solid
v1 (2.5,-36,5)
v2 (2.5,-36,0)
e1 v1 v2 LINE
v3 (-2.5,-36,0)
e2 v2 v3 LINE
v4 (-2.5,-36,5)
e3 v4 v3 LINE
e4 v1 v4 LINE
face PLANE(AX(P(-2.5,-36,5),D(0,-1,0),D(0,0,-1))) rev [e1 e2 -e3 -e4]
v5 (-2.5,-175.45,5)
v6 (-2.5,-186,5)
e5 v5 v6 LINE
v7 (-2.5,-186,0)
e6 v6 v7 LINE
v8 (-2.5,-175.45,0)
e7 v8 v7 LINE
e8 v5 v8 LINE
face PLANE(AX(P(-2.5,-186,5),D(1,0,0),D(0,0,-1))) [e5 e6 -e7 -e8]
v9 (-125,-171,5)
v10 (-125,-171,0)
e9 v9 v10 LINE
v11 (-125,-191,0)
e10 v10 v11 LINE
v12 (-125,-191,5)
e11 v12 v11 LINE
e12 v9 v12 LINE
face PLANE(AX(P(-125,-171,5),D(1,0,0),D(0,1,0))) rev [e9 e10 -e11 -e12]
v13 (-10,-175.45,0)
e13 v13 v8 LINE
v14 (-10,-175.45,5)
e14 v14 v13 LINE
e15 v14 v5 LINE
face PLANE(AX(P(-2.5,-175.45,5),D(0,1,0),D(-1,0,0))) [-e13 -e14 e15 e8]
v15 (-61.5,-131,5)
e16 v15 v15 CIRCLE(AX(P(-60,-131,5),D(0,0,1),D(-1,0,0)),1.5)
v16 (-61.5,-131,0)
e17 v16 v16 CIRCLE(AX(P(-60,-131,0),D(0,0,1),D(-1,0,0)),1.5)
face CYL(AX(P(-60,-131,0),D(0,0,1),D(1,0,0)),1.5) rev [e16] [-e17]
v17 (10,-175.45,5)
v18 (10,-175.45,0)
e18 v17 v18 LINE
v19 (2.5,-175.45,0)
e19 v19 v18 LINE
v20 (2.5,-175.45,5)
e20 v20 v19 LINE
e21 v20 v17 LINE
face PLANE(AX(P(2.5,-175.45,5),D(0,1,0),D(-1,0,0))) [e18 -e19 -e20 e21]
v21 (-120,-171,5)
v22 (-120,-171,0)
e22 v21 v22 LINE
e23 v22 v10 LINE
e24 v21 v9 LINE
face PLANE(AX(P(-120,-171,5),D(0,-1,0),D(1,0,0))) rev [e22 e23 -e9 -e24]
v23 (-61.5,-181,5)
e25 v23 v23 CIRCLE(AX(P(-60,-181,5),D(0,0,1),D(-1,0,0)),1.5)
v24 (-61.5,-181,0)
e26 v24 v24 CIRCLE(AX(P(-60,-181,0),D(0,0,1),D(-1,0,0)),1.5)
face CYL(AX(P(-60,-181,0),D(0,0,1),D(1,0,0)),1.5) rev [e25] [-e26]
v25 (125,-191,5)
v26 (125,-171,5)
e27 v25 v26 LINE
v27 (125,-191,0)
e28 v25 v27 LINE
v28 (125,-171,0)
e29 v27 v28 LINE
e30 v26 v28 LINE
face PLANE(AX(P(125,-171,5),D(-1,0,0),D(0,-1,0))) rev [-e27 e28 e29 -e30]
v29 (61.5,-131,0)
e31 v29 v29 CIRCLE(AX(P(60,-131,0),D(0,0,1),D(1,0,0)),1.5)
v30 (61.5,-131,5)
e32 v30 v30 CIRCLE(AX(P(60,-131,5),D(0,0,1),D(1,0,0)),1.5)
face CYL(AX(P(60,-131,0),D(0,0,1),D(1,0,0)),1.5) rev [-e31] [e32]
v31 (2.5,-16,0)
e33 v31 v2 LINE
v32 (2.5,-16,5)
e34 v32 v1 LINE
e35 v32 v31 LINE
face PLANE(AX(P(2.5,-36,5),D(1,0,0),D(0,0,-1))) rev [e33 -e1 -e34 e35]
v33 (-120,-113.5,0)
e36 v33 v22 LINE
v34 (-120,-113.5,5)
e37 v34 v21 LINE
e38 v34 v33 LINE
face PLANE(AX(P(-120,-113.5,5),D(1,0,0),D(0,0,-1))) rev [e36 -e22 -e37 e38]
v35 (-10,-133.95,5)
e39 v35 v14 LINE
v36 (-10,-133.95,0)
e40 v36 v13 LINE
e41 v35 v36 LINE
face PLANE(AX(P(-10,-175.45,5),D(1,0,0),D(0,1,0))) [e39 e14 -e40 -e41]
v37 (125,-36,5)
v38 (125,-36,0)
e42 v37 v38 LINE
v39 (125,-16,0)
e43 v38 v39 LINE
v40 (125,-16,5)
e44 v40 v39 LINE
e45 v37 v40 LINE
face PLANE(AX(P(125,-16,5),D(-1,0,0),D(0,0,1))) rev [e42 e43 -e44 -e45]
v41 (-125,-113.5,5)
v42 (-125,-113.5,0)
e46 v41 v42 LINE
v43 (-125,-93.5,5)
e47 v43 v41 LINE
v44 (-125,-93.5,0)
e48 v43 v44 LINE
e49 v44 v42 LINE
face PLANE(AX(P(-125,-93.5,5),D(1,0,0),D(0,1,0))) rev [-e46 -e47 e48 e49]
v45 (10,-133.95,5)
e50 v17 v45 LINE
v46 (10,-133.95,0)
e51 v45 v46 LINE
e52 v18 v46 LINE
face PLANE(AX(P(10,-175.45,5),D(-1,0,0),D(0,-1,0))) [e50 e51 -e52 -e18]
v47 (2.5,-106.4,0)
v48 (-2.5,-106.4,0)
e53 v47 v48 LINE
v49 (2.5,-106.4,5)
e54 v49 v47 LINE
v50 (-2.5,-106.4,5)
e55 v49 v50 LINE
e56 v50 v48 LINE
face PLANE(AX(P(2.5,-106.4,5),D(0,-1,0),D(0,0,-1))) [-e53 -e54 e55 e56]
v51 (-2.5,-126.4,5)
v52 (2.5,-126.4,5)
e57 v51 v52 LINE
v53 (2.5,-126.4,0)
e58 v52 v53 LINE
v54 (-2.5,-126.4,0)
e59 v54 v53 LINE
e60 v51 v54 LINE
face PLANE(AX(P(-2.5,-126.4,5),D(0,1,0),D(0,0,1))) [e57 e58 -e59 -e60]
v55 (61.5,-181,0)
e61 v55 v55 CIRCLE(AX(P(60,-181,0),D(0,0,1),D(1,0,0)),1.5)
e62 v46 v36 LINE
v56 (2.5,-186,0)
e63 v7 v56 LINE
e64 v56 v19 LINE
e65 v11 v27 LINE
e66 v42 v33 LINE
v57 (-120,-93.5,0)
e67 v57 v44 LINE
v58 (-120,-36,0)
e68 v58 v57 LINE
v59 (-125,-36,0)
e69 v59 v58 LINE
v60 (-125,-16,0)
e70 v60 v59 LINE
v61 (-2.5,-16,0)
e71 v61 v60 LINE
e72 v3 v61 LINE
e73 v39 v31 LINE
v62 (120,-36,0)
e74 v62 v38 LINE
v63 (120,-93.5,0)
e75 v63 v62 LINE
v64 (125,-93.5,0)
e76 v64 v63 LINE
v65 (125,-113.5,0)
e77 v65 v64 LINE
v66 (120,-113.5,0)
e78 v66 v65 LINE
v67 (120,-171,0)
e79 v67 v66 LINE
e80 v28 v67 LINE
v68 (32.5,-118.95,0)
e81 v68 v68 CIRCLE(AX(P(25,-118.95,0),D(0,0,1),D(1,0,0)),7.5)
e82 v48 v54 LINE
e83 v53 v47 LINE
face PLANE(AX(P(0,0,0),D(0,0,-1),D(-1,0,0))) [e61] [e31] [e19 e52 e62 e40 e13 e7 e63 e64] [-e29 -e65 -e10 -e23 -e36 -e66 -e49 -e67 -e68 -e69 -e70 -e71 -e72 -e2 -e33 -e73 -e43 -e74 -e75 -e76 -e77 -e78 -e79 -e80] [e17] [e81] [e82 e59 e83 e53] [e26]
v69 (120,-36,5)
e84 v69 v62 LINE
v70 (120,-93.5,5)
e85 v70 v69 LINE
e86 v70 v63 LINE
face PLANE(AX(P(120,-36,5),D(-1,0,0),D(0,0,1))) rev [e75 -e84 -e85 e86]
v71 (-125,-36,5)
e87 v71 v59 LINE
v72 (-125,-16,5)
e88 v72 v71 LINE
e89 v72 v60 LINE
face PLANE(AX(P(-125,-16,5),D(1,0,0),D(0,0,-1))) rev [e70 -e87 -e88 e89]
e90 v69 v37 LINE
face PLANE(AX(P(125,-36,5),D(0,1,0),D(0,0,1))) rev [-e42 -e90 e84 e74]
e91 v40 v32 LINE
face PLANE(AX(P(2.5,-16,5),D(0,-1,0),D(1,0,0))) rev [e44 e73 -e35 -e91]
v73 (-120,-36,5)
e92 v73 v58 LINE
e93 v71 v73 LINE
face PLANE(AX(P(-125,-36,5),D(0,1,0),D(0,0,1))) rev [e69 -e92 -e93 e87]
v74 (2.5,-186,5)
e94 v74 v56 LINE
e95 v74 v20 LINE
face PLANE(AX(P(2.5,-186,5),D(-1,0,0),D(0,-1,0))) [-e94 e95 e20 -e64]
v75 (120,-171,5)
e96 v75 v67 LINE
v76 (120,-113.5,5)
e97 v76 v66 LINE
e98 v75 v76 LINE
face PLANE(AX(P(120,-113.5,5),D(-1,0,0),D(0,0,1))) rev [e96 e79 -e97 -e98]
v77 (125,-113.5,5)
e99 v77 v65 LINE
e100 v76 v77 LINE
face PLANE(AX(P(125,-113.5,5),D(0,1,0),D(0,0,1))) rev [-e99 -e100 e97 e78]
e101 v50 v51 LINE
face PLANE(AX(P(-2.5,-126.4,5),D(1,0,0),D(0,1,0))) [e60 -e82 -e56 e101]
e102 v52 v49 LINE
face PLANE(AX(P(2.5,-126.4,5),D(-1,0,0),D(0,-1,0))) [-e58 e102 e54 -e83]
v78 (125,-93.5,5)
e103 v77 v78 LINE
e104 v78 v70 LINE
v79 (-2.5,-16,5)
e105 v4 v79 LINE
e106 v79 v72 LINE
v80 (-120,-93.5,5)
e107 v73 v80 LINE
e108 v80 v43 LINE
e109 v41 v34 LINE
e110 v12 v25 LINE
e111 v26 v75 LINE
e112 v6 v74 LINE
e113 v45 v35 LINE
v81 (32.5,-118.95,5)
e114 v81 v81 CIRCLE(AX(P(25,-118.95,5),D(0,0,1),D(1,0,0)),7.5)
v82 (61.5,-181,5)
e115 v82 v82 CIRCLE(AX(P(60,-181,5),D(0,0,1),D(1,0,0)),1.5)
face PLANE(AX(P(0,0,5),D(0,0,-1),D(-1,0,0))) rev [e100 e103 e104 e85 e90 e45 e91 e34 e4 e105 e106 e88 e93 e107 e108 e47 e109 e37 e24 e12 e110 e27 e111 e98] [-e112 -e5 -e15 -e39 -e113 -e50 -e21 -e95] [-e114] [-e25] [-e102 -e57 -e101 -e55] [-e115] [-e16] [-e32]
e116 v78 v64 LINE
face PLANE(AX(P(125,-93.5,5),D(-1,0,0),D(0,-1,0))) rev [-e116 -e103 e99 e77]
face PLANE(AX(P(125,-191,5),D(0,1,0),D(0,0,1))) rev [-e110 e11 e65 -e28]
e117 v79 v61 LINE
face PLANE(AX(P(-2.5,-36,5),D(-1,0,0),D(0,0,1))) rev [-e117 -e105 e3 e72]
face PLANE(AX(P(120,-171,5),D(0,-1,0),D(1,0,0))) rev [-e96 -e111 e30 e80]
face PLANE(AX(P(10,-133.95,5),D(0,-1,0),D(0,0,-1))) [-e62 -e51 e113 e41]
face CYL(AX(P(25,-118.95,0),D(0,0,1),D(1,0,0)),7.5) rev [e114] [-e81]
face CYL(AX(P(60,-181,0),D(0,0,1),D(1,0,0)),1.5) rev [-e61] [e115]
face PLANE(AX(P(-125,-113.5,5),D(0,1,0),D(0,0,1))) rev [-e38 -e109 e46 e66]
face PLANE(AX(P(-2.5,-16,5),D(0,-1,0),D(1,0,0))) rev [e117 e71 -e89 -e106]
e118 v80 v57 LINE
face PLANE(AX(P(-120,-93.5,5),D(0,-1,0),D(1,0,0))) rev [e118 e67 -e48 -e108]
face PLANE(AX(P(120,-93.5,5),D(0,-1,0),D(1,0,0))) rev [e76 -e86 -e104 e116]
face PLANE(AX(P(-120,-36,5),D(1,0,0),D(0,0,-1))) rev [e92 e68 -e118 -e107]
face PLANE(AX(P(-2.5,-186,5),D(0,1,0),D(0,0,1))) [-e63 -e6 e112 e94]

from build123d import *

# Parameters (mm, degrees)
BOSS_EXTRU_1_OUTLINE_W  = 5
BOSS_EXTRU_1_OUTLINE_H  = 20
BOSS_EXTRU_1_DEPTH      = 5
ESQUISSE2_R             = 1.5
ENL_V_MAT_EXTRU_1_DEPTH = 229.322140845
ESQUISSE3_R             = 7.5
ENL_V_MAT_EXTRU_2_DEPTH = 229.322140845


# Read off the part's stored shape, not the designer's step: Boss.-Extru.1
with BuildPart() as part:
    # Boss.-Extru.1 outline → Boss.-Extru.1 (new body)
    with BuildSketch(Plane.XY):
        Polygon((125, -16), (2.5, -16), (2.5, -36), (-2.5, -36), (-2.5, -16), (-125, -16), (-125, -36), (-120, -36), (-120, -93.5), (-125, -93.5), (-125, -113.5), (-120, -113.5), (-120, -171), (-125, -171), (-125, -191), (125, -191), (125, -171), (120, -171), (120, -113.5), (125, -113.5), (125, -93.5), (120, -93.5), (120, -36), (125, -36), align=None)
        Polygon((10, -133.95), (10, -175.45), (2.5, -175.45), (2.5, -186), (-2.5, -186), (-2.5, -175.45), (-10, -175.45), (-10, -133.95), align=None, mode=Mode.SUBTRACT)
        with Locations((0, -116.4)):
            Rectangle(BOSS_EXTRU_1_OUTLINE_W, BOSS_EXTRU_1_OUTLINE_H, mode=Mode.SUBTRACT)
    extrude(amount=BOSS_EXTRU_1_DEPTH)

    # Esquisse2 → Enlèv. mat.-Extru.1 (cut, through all)
    with BuildSketch(Plane.XY.offset(5)):
        with Locations((60, -131)):
            Circle(ESQUISSE2_R)
        with Locations((60, -181)):
            Circle(ESQUISSE2_R)
        with Locations(Location((-60, -131, 0), (0, 0, 180))):
            Circle(ESQUISSE2_R)
        with Locations(Location((-60, -181, 0), (0, 0, 180))):
            Circle(ESQUISSE2_R)
    extrude(amount=-ENL_V_MAT_EXTRU_1_DEPTH, mode=Mode.SUBTRACT)

    # Esquisse3 → Enlèv. mat.-Extru.2 (cut, through all)
    with BuildSketch(Plane.XY.offset(5)):
        with Locations((25, -118.95)):
            Circle(ESQUISSE3_R)
    extrude(amount=-ENL_V_MAT_EXTRU_2_DEPTH, mode=Mode.SUBTRACT)


solid = part.part
